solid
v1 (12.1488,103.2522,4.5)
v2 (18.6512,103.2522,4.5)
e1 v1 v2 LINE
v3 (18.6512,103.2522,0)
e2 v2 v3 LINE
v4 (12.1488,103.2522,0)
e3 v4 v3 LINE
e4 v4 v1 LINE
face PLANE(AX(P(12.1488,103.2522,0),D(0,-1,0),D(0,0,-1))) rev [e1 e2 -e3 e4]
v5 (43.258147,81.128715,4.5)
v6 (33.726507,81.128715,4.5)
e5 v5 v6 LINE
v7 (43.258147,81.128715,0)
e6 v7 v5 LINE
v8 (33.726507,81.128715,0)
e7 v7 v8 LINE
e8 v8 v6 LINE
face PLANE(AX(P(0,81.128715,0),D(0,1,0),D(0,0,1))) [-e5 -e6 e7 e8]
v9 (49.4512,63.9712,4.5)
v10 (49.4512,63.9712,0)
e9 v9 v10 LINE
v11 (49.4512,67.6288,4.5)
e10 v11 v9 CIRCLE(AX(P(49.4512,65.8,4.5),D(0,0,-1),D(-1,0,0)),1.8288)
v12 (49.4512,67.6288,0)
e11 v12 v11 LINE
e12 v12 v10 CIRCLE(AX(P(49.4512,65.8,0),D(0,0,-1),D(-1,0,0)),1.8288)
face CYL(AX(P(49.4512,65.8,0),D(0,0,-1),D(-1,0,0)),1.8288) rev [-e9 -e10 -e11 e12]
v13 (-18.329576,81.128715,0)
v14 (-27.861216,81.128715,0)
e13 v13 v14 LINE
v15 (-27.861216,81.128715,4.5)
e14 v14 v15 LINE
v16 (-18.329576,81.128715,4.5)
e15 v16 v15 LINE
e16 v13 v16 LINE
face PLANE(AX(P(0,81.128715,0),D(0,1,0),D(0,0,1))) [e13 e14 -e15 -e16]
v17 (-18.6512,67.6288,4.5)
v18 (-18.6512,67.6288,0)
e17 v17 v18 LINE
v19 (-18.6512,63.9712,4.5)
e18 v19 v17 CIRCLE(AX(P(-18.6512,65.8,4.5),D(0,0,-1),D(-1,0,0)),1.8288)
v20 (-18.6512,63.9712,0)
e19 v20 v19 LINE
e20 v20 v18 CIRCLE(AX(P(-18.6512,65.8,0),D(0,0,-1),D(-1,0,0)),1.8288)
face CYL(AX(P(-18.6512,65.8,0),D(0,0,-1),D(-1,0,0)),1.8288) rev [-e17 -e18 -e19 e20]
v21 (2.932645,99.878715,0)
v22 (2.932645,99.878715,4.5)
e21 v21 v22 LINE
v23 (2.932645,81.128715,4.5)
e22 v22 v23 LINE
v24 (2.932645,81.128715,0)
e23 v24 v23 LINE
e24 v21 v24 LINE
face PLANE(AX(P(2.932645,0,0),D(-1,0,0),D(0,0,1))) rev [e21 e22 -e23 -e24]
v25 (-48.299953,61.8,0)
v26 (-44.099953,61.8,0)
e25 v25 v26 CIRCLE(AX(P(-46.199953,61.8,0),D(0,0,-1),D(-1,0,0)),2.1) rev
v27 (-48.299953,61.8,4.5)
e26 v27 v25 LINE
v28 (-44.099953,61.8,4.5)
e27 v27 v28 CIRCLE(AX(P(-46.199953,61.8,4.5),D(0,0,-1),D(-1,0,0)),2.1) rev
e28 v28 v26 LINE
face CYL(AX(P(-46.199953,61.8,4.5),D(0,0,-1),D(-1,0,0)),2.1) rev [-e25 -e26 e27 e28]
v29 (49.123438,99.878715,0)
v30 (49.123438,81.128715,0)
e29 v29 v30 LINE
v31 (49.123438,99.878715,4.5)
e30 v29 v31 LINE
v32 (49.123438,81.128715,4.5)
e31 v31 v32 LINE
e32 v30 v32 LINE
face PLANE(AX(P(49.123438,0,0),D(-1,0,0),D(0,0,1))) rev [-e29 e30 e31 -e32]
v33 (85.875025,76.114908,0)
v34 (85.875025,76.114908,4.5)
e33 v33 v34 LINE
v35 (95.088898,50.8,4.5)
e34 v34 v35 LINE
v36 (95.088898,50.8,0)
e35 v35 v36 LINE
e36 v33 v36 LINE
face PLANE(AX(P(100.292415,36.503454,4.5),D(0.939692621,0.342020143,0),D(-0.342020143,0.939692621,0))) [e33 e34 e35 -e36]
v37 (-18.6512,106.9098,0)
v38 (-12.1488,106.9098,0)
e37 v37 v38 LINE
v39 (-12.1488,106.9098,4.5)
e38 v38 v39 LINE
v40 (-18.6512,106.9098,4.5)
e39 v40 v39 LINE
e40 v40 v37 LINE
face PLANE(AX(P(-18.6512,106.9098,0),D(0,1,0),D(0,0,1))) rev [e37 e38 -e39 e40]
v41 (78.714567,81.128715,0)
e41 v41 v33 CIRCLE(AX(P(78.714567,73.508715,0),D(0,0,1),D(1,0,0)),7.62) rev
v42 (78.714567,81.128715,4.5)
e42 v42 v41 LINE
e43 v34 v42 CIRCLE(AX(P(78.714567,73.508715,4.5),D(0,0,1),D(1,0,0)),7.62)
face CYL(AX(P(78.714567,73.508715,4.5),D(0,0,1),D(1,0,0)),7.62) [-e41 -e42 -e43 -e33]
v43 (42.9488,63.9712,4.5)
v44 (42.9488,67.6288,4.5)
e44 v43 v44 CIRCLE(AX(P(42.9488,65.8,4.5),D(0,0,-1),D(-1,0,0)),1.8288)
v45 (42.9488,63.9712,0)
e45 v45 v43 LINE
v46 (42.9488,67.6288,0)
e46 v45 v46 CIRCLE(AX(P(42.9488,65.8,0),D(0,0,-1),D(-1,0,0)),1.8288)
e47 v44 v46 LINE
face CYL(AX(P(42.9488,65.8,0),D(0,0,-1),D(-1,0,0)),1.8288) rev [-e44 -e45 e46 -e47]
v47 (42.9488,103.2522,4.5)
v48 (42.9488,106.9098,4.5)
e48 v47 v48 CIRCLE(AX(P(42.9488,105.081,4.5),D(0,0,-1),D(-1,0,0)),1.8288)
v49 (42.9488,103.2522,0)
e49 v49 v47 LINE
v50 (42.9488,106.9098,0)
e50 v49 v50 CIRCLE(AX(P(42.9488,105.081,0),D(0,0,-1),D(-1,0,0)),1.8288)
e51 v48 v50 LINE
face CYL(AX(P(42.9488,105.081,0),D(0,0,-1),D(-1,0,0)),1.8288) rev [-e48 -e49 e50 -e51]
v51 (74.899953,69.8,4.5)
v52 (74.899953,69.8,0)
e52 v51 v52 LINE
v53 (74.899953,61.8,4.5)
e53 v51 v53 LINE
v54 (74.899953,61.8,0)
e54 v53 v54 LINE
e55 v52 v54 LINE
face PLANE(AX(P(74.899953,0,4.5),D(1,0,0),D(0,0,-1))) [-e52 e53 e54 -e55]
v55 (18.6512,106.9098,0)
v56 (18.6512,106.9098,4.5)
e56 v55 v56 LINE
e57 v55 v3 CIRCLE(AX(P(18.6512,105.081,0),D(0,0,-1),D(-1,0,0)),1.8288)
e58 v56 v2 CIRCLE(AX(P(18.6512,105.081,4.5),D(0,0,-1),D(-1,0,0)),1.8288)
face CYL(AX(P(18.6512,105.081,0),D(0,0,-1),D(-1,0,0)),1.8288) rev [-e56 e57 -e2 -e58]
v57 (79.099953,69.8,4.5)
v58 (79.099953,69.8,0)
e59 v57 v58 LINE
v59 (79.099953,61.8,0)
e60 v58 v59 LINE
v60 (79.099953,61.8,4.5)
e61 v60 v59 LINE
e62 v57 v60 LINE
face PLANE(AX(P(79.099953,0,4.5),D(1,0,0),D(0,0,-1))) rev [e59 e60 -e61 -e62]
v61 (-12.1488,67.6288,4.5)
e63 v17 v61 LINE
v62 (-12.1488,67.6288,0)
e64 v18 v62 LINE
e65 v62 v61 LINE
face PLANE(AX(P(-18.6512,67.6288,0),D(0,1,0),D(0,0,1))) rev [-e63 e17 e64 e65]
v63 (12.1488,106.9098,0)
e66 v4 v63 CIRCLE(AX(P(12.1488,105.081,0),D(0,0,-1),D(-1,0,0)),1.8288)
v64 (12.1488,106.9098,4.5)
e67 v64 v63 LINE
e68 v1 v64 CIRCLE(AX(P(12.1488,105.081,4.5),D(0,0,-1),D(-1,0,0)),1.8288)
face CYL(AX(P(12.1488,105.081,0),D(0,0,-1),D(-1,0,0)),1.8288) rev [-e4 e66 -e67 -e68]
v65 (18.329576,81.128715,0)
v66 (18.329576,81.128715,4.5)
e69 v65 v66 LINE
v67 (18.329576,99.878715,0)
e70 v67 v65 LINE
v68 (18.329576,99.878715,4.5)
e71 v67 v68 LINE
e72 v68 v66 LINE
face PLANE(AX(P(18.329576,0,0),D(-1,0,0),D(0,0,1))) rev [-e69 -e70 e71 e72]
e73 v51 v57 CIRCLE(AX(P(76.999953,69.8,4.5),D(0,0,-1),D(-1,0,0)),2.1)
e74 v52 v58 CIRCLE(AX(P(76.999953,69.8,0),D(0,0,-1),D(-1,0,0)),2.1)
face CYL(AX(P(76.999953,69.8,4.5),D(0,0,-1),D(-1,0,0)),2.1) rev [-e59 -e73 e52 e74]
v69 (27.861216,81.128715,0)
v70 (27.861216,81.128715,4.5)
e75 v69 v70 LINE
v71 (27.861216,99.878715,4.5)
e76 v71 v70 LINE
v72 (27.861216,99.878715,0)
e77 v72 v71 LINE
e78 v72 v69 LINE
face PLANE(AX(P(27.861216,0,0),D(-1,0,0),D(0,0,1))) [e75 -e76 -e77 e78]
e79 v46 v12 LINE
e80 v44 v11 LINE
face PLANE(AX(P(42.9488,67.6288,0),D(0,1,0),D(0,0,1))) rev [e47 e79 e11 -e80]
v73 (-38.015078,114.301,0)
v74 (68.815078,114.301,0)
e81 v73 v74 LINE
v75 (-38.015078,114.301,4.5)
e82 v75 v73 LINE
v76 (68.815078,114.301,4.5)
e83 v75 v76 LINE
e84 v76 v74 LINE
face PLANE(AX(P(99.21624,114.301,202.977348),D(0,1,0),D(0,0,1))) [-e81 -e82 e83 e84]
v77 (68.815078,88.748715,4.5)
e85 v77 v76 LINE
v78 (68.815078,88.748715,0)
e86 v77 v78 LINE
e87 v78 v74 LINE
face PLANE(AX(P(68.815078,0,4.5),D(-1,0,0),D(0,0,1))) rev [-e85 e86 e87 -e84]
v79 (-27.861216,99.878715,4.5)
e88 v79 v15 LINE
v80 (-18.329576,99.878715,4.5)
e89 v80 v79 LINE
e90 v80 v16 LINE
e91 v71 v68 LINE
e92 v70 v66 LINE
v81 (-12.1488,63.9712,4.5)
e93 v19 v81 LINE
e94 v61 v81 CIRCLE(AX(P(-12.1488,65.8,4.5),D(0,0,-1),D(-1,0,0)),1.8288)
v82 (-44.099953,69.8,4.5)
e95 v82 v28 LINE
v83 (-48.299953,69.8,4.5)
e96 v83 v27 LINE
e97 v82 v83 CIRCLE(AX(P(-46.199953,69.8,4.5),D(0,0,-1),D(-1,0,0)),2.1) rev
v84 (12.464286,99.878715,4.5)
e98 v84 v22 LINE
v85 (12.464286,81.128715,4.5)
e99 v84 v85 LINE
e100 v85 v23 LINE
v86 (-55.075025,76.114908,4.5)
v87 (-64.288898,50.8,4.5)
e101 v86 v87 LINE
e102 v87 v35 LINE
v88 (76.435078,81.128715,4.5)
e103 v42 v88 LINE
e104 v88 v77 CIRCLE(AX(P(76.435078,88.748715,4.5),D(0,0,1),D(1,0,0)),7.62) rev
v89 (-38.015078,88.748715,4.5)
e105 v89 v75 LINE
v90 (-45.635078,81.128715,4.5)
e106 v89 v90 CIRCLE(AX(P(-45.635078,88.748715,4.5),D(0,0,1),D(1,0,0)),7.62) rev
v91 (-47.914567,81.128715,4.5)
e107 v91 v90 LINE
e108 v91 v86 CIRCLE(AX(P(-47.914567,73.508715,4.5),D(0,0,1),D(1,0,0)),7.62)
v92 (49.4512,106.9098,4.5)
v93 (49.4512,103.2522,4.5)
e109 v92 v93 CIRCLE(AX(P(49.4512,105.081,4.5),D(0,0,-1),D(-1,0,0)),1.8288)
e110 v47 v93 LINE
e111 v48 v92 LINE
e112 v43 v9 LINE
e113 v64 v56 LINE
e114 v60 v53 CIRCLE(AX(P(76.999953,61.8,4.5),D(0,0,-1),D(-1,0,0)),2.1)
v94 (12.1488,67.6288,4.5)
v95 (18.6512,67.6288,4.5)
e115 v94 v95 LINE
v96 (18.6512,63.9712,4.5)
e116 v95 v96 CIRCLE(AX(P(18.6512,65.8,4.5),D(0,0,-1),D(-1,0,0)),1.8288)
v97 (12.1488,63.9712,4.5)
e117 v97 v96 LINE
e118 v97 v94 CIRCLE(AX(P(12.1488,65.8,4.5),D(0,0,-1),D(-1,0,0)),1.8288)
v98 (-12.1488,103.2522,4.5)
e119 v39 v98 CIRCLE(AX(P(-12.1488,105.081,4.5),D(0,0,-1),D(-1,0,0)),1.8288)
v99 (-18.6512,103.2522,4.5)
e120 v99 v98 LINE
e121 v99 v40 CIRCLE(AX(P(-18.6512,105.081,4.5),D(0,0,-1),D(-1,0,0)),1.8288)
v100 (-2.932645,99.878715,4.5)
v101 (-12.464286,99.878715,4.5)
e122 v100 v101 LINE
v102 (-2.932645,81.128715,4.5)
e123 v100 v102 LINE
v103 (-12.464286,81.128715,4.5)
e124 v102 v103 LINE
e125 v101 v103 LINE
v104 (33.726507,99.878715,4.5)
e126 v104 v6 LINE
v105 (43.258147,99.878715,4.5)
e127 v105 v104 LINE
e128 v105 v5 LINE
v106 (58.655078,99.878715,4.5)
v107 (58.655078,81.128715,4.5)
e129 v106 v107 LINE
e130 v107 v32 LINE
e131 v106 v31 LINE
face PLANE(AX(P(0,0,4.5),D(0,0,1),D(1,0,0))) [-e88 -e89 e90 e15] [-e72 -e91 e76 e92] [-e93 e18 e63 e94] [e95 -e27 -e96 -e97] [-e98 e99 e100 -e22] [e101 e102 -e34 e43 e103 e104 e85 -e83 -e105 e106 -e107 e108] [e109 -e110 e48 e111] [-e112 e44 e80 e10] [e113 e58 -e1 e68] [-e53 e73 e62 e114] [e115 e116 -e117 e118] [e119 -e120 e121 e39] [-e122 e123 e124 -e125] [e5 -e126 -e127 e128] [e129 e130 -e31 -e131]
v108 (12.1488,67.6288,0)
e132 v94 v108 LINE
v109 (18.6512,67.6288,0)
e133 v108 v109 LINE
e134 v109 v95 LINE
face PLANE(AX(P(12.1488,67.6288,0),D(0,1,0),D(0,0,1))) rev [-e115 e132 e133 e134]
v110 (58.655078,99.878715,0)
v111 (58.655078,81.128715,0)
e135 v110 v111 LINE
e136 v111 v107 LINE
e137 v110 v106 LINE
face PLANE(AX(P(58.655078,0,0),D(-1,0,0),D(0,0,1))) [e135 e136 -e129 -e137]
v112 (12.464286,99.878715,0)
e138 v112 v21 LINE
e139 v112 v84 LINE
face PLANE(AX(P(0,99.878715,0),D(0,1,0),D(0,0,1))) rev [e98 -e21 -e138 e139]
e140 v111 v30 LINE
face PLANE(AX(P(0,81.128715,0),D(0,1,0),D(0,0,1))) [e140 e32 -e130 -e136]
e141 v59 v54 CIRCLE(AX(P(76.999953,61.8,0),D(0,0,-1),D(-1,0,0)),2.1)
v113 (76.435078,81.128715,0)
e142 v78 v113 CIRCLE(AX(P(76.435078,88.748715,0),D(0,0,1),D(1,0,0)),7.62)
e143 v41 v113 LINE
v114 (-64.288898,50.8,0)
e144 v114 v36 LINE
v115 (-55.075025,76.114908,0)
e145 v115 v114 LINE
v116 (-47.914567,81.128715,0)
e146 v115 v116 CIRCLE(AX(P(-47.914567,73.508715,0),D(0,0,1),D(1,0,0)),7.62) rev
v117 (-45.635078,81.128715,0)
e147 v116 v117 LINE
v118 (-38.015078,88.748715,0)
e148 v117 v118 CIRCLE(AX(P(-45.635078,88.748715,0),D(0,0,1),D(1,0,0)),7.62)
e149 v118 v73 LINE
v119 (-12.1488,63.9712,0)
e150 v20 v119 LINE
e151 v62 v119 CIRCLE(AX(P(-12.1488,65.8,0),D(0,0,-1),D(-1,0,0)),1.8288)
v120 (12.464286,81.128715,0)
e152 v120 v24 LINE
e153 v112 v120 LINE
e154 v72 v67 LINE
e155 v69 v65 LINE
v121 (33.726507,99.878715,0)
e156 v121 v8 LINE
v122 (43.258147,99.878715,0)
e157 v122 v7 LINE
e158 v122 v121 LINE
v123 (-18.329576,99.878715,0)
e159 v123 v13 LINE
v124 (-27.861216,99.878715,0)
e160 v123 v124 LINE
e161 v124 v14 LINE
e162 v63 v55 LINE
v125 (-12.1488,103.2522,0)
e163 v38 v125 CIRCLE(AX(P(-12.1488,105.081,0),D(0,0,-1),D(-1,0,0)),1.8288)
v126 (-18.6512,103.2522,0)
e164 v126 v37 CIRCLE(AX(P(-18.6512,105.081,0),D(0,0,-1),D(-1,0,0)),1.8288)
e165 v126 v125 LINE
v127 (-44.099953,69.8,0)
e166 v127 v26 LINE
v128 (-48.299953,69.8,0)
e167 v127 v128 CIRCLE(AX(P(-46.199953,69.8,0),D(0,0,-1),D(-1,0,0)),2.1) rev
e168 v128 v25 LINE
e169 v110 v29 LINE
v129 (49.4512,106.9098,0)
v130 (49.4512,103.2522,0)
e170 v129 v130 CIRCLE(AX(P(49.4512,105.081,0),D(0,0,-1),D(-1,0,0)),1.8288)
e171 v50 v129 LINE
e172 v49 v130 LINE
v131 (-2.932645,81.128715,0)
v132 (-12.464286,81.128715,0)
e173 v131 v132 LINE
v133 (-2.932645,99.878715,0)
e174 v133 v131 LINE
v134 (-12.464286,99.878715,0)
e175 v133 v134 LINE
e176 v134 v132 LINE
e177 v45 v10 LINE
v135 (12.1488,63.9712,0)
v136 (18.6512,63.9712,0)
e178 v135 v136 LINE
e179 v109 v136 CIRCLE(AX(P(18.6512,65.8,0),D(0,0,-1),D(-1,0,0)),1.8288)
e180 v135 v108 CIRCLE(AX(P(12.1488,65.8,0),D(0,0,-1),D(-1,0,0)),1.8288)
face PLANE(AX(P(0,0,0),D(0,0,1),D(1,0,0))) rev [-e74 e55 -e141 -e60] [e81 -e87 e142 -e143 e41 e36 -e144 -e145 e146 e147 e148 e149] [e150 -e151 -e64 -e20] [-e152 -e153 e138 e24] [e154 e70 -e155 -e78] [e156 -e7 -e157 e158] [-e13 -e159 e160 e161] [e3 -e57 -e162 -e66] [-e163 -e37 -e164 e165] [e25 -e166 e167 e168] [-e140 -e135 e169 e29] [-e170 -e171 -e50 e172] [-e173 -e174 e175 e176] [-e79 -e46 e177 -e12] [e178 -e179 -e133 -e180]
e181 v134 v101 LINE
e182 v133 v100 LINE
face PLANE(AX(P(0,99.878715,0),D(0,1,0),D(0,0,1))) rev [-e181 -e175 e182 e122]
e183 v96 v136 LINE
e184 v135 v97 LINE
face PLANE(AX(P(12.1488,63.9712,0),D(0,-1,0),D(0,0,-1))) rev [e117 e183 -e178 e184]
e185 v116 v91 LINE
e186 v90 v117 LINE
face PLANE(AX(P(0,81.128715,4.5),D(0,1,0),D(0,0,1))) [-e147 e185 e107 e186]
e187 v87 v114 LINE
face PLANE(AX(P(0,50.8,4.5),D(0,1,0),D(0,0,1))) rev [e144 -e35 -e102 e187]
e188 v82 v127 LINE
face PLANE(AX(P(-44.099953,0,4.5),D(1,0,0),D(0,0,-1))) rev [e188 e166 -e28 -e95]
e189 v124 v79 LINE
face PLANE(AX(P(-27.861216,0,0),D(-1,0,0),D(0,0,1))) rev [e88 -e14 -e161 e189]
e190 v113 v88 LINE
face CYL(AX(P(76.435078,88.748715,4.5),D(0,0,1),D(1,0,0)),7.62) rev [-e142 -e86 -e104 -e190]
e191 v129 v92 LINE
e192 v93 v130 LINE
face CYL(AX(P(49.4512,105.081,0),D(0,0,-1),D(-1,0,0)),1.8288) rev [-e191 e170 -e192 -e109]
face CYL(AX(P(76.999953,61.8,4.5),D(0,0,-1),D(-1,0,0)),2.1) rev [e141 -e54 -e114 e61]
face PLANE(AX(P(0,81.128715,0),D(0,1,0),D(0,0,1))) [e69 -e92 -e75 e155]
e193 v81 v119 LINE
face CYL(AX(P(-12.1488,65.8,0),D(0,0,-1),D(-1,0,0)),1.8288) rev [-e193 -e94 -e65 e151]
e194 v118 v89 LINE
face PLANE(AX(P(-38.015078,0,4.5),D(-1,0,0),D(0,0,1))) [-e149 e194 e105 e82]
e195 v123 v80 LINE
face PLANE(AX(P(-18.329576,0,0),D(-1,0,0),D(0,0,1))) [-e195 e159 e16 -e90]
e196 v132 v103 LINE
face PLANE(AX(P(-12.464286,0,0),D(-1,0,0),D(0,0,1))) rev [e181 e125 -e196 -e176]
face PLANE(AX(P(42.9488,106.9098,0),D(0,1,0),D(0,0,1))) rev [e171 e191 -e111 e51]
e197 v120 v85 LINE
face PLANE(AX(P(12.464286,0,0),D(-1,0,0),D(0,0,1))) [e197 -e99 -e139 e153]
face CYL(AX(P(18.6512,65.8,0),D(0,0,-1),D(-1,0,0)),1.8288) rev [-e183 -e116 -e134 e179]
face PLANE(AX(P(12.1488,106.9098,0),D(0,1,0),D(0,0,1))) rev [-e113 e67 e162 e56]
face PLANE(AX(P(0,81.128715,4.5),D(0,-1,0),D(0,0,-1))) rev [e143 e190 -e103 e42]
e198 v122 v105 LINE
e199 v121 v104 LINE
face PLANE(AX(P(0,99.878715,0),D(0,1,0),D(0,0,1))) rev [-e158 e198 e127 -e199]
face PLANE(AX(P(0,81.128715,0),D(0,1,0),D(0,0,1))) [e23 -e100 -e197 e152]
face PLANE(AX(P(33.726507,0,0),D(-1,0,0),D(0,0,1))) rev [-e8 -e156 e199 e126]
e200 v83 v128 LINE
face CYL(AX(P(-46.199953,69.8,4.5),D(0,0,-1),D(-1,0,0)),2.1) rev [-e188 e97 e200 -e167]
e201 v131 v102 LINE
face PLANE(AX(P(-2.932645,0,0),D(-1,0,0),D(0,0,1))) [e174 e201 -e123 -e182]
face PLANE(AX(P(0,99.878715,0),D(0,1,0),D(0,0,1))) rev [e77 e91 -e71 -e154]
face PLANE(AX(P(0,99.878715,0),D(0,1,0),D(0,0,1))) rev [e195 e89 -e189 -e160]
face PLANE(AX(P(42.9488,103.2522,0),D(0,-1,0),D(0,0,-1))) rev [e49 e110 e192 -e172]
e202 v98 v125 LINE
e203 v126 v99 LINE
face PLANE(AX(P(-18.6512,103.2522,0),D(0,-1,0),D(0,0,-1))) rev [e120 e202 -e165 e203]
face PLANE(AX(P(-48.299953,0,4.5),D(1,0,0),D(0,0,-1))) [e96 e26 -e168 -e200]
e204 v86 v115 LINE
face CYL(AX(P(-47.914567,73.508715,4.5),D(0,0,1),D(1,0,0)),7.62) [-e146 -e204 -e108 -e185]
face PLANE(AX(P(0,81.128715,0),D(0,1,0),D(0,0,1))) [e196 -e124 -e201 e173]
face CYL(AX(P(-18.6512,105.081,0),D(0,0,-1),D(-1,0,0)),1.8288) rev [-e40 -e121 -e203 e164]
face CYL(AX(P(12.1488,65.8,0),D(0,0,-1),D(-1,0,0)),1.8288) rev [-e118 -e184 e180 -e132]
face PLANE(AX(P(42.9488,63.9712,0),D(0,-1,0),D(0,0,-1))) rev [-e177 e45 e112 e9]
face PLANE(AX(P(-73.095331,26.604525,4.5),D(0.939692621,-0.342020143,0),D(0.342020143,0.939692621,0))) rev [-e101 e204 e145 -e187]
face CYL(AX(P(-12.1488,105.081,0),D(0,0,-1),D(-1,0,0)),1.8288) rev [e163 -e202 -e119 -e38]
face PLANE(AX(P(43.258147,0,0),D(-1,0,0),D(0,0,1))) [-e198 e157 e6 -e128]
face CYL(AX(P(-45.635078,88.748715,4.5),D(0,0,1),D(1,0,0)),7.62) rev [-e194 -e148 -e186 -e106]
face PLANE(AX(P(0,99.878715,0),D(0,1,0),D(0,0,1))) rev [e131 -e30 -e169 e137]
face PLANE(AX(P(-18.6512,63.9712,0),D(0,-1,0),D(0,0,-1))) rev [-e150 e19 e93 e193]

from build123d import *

# Parameters (mm, degrees)
SKETCH1_W                           = 198.43248
SKETCH1_H                           = 59.281
SKETCH1_R                           = 1.5
BOSS_EXTRUDE1_DEPTH                 = 4.5
SKETCH4_W                           = 9.531640124
SKETCH4_H                           = 18.749999962
SKETCH4_W_2                         = 9.531640123
CUT_EXTRUDE2_DEPTH                  = 149.263073085
CUT_EXTRUDE3_DEPTH                  = 149.263073085
SKETCH6_W                           = 198.43248
SKETCH6_H                           = 4.22
BOSS_EXTRUDE2_DEPTH                 = 4.5
CUT_EXTRUDE4_DEPTH                  = 152.422689452
FILLET1_R                           = 7.62
F_27_0_144_DIAMETER_SLOT1_OUTLINE_R = 1.5
F_27_0_144_DIAMETER_SLOT1_DEPTH     = 4.5


# Read off the part's stored shape, not the designer's step: #27 (0.144) Diameter Slot1
with BuildPart() as part:
    # Sketch1 → Boss-Extrude1 (new body)
    with BuildSketch(Plane.XY):
        with Locations((0, 80.4405)):
            Rectangle(SKETCH1_W, SKETCH1_H)
        with Locations((46.2, 105.081)):
            Circle(SKETCH1_R, mode=Mode.SUBTRACT)
        with Locations((46.2, 65.8)):
            Circle(SKETCH1_R, mode=Mode.SUBTRACT)
        with Locations((15.4, 65.8)):
            Circle(SKETCH1_R, mode=Mode.SUBTRACT)
        with Locations((15.4, 105.081)):
            Circle(SKETCH1_R, mode=Mode.SUBTRACT)
        with Locations((-15.4, 105.081)):
            Circle(SKETCH1_R, mode=Mode.SUBTRACT)
        with Locations((-15.4, 65.8)):
            Circle(SKETCH1_R, mode=Mode.SUBTRACT)
    extrude(amount=BOSS_EXTRUDE1_DEPTH)

    # Sketch4 → Cut-Extrude2 (cut, through all)
    with BuildSketch(Plane(origin=(0, 0, 4.5), x_dir=(-1, 0, 0), z_dir=(0, 0, -1))):
        with Locations((-53.889258182, 90.503714938)):
            Rectangle(SKETCH4_W, SKETCH4_H)
        with Locations((-38.492327273, 90.503714938)):
            Rectangle(SKETCH4_W, SKETCH4_H)
        with Locations((-23.095396364, 90.503714938)):
            Rectangle(SKETCH4_W_2, SKETCH4_H)
        with Locations((-7.698465454, 90.503714938)):
            Rectangle(SKETCH4_W_2, SKETCH4_H)
        with Locations((7.698465454, 90.503714938)):
            Rectangle(SKETCH4_W_2, SKETCH4_H)
        with Locations((23.095396364, 90.503714938)):
            Rectangle(SKETCH4_W_2, SKETCH4_H)
    extrude(amount=CUT_EXTRUDE2_DEPTH, mode=Mode.SUBTRACT)

    # Sketch5 → Cut-Extrude3 (cut, through all)
    with BuildSketch(Plane(origin=(0, 0, 0), x_dir=(-1, 0, 0), z_dir=(0, 0, -1))):
        with BuildLine():
            Line((-74.899953, 69.8), (-74.899953, 61.8))
            ThreePointArc((-74.899953, 61.8), (-76.999953, 59.7), (-79.099953, 61.8))
            Line((-79.099953, 61.8), (-79.099953, 69.8))
            ThreePointArc((-79.099953, 69.8), (-76.999953, 71.9), (-74.899953, 69.8))
        make_face()
        with BuildLine():
            Line((44.099953, 69.8), (44.099953, 61.8))
            ThreePointArc((44.099953, 61.8), (46.199953, 59.7), (48.299953, 61.8))
            Line((48.299953, 61.8), (48.299953, 69.8))
            ThreePointArc((48.299953, 69.8), (46.199953, 71.9), (44.099953, 69.8))
        make_face()
    extrude(amount=-CUT_EXTRUDE3_DEPTH, mode=Mode.SUBTRACT)

    # Sketch6 → Boss-Extrude2 (add)
    with BuildSketch(Plane(origin=(0, 0, 0), x_dir=(-1, 0, 0), z_dir=(0, 0, -1))):
        with Locations((0, 112.191)):
            Rectangle(SKETCH6_W, SKETCH6_H)
    extrude(amount=-BOSS_EXTRUDE2_DEPTH)

    # Sketch7 → Cut-Extrude4 (cut, through all)
    with BuildSketch(Plane(origin=(0, 0, 0), x_dir=(-1, 0, 0), z_dir=(0, 0, -1))):
        Polygon((-68.815078244, 114.301), (-99.21624, 114.301), (-99.21624, 50.8), (-95.088898012, 50.8), (-84.050148524, 81.128714957), (-68.815078244, 81.128714957), align=None)
        Polygon((99.21624, 114.301), (38.015078244, 114.301), (38.015078244, 81.128714957), (53.250148524, 81.128714957), (64.288898012, 50.8), (99.21624, 50.8), align=None)
    extrude(amount=-CUT_EXTRUDE4_DEPTH, mode=Mode.SUBTRACT)

    # Fillet1
    fillet1_edges = [part.edges().sort_by_distance(p)[0] for p in [
        (84.050148524, 81.128714957, 2.25),
        (68.815078244, 81.128714957, 2.25),
        (-53.250148524, 81.128714957, 2.25),
        (-38.015078244, 81.128714957, 2.25),
    ]]
    fillet(fillet1_edges, radius=FILLET1_R)

    # #27 (0.144) Diameter Slot1 outline → #27 (0.144) Diameter Slot1 (cut)
    # profile 1 of 6: a face of its own
    with BuildSketch(Plane.XY):
        with BuildLine():
            ThreePointArc((49.4512, 103.2522), (51.28, 105.081), (49.4512, 106.9098))
            Line((49.4512, 106.9098), (42.9488, 106.9098))
            ThreePointArc((42.9488, 106.9098), (41.12, 105.081), (42.9488, 103.2522))
            Line((42.9488, 103.2522), (49.4512, 103.2522))
        make_face()
        with Locations((46.2, 105.081)):
            Circle(F_27_0_144_DIAMETER_SLOT1_OUTLINE_R, mode=Mode.SUBTRACT)
    # profile 2 of 6: a face of its own
    with BuildSketch(Plane.XY):
        with BuildLine():
            ThreePointArc((12.1488, 106.9098), (10.32, 105.081), (12.1488, 103.2522))
            Line((12.1488, 103.2522), (18.6512, 103.2522))
            ThreePointArc((18.6512, 103.2522), (20.48, 105.081), (18.6512, 106.9098))
            Line((18.6512, 106.9098), (12.1488, 106.9098))
        make_face()
        with Locations((15.4, 105.081)):
            Circle(F_27_0_144_DIAMETER_SLOT1_OUTLINE_R, mode=Mode.SUBTRACT)
    # profile 3 of 6: a face of its own
    with BuildSketch(Plane.XY):
        with BuildLine():
            ThreePointArc((-18.6512, 106.9098), (-20.48, 105.081), (-18.6512, 103.2522))
            Line((-18.6512, 103.2522), (-12.1488, 103.2522))
            ThreePointArc((-12.1488, 103.2522), (-10.32, 105.081), (-12.1488, 106.9098))
            Line((-12.1488, 106.9098), (-18.6512, 106.9098))
        make_face()
        with Locations((-15.4, 105.081)):
            Circle(F_27_0_144_DIAMETER_SLOT1_OUTLINE_R, mode=Mode.SUBTRACT)
    # profile 4 of 6: a face of its own
    with BuildSketch(Plane.XY):
        with BuildLine():
            ThreePointArc((-12.1488, 63.9712), (-10.32, 65.8), (-12.1488, 67.6288))
            Line((-12.1488, 67.6288), (-18.6512, 67.6288))
            ThreePointArc((-18.6512, 67.6288), (-20.48, 65.8), (-18.6512, 63.9712))
            Line((-18.6512, 63.9712), (-12.1488, 63.9712))
        make_face()
        with Locations((-15.4, 65.8)):
            Circle(F_27_0_144_DIAMETER_SLOT1_OUTLINE_R, mode=Mode.SUBTRACT)
    # profile 5 of 6: a face of its own
    with BuildSketch(Plane.XY):
        with BuildLine():
            ThreePointArc((12.1488, 67.6288), (10.32, 65.8), (12.1488, 63.9712))
            Line((12.1488, 63.9712), (18.6512, 63.9712))
            ThreePointArc((18.6512, 63.9712), (20.48, 65.8), (18.6512, 67.6288))
            Line((18.6512, 67.6288), (12.1488, 67.6288))
        make_face()
        with Locations((15.4, 65.8)):
            Circle(F_27_0_144_DIAMETER_SLOT1_OUTLINE_R, mode=Mode.SUBTRACT)
    # profile 6 of 6: a face of its own
    with BuildSketch(Plane.XY):
        with BuildLine():
            ThreePointArc((42.9488, 67.6288), (41.12, 65.8), (42.9488, 63.9712))
            Line((42.9488, 63.9712), (49.4512, 63.9712))
            ThreePointArc((49.4512, 63.9712), (51.28, 65.8), (49.4512, 67.6288))
            Line((49.4512, 67.6288), (42.9488, 67.6288))
        make_face()
        with Locations((46.2, 65.8)):
            Circle(F_27_0_144_DIAMETER_SLOT1_OUTLINE_R, mode=Mode.SUBTRACT)
    extrude(amount=F_27_0_144_DIAMETER_SLOT1_DEPTH, mode=Mode.SUBTRACT)


solid = part.part
